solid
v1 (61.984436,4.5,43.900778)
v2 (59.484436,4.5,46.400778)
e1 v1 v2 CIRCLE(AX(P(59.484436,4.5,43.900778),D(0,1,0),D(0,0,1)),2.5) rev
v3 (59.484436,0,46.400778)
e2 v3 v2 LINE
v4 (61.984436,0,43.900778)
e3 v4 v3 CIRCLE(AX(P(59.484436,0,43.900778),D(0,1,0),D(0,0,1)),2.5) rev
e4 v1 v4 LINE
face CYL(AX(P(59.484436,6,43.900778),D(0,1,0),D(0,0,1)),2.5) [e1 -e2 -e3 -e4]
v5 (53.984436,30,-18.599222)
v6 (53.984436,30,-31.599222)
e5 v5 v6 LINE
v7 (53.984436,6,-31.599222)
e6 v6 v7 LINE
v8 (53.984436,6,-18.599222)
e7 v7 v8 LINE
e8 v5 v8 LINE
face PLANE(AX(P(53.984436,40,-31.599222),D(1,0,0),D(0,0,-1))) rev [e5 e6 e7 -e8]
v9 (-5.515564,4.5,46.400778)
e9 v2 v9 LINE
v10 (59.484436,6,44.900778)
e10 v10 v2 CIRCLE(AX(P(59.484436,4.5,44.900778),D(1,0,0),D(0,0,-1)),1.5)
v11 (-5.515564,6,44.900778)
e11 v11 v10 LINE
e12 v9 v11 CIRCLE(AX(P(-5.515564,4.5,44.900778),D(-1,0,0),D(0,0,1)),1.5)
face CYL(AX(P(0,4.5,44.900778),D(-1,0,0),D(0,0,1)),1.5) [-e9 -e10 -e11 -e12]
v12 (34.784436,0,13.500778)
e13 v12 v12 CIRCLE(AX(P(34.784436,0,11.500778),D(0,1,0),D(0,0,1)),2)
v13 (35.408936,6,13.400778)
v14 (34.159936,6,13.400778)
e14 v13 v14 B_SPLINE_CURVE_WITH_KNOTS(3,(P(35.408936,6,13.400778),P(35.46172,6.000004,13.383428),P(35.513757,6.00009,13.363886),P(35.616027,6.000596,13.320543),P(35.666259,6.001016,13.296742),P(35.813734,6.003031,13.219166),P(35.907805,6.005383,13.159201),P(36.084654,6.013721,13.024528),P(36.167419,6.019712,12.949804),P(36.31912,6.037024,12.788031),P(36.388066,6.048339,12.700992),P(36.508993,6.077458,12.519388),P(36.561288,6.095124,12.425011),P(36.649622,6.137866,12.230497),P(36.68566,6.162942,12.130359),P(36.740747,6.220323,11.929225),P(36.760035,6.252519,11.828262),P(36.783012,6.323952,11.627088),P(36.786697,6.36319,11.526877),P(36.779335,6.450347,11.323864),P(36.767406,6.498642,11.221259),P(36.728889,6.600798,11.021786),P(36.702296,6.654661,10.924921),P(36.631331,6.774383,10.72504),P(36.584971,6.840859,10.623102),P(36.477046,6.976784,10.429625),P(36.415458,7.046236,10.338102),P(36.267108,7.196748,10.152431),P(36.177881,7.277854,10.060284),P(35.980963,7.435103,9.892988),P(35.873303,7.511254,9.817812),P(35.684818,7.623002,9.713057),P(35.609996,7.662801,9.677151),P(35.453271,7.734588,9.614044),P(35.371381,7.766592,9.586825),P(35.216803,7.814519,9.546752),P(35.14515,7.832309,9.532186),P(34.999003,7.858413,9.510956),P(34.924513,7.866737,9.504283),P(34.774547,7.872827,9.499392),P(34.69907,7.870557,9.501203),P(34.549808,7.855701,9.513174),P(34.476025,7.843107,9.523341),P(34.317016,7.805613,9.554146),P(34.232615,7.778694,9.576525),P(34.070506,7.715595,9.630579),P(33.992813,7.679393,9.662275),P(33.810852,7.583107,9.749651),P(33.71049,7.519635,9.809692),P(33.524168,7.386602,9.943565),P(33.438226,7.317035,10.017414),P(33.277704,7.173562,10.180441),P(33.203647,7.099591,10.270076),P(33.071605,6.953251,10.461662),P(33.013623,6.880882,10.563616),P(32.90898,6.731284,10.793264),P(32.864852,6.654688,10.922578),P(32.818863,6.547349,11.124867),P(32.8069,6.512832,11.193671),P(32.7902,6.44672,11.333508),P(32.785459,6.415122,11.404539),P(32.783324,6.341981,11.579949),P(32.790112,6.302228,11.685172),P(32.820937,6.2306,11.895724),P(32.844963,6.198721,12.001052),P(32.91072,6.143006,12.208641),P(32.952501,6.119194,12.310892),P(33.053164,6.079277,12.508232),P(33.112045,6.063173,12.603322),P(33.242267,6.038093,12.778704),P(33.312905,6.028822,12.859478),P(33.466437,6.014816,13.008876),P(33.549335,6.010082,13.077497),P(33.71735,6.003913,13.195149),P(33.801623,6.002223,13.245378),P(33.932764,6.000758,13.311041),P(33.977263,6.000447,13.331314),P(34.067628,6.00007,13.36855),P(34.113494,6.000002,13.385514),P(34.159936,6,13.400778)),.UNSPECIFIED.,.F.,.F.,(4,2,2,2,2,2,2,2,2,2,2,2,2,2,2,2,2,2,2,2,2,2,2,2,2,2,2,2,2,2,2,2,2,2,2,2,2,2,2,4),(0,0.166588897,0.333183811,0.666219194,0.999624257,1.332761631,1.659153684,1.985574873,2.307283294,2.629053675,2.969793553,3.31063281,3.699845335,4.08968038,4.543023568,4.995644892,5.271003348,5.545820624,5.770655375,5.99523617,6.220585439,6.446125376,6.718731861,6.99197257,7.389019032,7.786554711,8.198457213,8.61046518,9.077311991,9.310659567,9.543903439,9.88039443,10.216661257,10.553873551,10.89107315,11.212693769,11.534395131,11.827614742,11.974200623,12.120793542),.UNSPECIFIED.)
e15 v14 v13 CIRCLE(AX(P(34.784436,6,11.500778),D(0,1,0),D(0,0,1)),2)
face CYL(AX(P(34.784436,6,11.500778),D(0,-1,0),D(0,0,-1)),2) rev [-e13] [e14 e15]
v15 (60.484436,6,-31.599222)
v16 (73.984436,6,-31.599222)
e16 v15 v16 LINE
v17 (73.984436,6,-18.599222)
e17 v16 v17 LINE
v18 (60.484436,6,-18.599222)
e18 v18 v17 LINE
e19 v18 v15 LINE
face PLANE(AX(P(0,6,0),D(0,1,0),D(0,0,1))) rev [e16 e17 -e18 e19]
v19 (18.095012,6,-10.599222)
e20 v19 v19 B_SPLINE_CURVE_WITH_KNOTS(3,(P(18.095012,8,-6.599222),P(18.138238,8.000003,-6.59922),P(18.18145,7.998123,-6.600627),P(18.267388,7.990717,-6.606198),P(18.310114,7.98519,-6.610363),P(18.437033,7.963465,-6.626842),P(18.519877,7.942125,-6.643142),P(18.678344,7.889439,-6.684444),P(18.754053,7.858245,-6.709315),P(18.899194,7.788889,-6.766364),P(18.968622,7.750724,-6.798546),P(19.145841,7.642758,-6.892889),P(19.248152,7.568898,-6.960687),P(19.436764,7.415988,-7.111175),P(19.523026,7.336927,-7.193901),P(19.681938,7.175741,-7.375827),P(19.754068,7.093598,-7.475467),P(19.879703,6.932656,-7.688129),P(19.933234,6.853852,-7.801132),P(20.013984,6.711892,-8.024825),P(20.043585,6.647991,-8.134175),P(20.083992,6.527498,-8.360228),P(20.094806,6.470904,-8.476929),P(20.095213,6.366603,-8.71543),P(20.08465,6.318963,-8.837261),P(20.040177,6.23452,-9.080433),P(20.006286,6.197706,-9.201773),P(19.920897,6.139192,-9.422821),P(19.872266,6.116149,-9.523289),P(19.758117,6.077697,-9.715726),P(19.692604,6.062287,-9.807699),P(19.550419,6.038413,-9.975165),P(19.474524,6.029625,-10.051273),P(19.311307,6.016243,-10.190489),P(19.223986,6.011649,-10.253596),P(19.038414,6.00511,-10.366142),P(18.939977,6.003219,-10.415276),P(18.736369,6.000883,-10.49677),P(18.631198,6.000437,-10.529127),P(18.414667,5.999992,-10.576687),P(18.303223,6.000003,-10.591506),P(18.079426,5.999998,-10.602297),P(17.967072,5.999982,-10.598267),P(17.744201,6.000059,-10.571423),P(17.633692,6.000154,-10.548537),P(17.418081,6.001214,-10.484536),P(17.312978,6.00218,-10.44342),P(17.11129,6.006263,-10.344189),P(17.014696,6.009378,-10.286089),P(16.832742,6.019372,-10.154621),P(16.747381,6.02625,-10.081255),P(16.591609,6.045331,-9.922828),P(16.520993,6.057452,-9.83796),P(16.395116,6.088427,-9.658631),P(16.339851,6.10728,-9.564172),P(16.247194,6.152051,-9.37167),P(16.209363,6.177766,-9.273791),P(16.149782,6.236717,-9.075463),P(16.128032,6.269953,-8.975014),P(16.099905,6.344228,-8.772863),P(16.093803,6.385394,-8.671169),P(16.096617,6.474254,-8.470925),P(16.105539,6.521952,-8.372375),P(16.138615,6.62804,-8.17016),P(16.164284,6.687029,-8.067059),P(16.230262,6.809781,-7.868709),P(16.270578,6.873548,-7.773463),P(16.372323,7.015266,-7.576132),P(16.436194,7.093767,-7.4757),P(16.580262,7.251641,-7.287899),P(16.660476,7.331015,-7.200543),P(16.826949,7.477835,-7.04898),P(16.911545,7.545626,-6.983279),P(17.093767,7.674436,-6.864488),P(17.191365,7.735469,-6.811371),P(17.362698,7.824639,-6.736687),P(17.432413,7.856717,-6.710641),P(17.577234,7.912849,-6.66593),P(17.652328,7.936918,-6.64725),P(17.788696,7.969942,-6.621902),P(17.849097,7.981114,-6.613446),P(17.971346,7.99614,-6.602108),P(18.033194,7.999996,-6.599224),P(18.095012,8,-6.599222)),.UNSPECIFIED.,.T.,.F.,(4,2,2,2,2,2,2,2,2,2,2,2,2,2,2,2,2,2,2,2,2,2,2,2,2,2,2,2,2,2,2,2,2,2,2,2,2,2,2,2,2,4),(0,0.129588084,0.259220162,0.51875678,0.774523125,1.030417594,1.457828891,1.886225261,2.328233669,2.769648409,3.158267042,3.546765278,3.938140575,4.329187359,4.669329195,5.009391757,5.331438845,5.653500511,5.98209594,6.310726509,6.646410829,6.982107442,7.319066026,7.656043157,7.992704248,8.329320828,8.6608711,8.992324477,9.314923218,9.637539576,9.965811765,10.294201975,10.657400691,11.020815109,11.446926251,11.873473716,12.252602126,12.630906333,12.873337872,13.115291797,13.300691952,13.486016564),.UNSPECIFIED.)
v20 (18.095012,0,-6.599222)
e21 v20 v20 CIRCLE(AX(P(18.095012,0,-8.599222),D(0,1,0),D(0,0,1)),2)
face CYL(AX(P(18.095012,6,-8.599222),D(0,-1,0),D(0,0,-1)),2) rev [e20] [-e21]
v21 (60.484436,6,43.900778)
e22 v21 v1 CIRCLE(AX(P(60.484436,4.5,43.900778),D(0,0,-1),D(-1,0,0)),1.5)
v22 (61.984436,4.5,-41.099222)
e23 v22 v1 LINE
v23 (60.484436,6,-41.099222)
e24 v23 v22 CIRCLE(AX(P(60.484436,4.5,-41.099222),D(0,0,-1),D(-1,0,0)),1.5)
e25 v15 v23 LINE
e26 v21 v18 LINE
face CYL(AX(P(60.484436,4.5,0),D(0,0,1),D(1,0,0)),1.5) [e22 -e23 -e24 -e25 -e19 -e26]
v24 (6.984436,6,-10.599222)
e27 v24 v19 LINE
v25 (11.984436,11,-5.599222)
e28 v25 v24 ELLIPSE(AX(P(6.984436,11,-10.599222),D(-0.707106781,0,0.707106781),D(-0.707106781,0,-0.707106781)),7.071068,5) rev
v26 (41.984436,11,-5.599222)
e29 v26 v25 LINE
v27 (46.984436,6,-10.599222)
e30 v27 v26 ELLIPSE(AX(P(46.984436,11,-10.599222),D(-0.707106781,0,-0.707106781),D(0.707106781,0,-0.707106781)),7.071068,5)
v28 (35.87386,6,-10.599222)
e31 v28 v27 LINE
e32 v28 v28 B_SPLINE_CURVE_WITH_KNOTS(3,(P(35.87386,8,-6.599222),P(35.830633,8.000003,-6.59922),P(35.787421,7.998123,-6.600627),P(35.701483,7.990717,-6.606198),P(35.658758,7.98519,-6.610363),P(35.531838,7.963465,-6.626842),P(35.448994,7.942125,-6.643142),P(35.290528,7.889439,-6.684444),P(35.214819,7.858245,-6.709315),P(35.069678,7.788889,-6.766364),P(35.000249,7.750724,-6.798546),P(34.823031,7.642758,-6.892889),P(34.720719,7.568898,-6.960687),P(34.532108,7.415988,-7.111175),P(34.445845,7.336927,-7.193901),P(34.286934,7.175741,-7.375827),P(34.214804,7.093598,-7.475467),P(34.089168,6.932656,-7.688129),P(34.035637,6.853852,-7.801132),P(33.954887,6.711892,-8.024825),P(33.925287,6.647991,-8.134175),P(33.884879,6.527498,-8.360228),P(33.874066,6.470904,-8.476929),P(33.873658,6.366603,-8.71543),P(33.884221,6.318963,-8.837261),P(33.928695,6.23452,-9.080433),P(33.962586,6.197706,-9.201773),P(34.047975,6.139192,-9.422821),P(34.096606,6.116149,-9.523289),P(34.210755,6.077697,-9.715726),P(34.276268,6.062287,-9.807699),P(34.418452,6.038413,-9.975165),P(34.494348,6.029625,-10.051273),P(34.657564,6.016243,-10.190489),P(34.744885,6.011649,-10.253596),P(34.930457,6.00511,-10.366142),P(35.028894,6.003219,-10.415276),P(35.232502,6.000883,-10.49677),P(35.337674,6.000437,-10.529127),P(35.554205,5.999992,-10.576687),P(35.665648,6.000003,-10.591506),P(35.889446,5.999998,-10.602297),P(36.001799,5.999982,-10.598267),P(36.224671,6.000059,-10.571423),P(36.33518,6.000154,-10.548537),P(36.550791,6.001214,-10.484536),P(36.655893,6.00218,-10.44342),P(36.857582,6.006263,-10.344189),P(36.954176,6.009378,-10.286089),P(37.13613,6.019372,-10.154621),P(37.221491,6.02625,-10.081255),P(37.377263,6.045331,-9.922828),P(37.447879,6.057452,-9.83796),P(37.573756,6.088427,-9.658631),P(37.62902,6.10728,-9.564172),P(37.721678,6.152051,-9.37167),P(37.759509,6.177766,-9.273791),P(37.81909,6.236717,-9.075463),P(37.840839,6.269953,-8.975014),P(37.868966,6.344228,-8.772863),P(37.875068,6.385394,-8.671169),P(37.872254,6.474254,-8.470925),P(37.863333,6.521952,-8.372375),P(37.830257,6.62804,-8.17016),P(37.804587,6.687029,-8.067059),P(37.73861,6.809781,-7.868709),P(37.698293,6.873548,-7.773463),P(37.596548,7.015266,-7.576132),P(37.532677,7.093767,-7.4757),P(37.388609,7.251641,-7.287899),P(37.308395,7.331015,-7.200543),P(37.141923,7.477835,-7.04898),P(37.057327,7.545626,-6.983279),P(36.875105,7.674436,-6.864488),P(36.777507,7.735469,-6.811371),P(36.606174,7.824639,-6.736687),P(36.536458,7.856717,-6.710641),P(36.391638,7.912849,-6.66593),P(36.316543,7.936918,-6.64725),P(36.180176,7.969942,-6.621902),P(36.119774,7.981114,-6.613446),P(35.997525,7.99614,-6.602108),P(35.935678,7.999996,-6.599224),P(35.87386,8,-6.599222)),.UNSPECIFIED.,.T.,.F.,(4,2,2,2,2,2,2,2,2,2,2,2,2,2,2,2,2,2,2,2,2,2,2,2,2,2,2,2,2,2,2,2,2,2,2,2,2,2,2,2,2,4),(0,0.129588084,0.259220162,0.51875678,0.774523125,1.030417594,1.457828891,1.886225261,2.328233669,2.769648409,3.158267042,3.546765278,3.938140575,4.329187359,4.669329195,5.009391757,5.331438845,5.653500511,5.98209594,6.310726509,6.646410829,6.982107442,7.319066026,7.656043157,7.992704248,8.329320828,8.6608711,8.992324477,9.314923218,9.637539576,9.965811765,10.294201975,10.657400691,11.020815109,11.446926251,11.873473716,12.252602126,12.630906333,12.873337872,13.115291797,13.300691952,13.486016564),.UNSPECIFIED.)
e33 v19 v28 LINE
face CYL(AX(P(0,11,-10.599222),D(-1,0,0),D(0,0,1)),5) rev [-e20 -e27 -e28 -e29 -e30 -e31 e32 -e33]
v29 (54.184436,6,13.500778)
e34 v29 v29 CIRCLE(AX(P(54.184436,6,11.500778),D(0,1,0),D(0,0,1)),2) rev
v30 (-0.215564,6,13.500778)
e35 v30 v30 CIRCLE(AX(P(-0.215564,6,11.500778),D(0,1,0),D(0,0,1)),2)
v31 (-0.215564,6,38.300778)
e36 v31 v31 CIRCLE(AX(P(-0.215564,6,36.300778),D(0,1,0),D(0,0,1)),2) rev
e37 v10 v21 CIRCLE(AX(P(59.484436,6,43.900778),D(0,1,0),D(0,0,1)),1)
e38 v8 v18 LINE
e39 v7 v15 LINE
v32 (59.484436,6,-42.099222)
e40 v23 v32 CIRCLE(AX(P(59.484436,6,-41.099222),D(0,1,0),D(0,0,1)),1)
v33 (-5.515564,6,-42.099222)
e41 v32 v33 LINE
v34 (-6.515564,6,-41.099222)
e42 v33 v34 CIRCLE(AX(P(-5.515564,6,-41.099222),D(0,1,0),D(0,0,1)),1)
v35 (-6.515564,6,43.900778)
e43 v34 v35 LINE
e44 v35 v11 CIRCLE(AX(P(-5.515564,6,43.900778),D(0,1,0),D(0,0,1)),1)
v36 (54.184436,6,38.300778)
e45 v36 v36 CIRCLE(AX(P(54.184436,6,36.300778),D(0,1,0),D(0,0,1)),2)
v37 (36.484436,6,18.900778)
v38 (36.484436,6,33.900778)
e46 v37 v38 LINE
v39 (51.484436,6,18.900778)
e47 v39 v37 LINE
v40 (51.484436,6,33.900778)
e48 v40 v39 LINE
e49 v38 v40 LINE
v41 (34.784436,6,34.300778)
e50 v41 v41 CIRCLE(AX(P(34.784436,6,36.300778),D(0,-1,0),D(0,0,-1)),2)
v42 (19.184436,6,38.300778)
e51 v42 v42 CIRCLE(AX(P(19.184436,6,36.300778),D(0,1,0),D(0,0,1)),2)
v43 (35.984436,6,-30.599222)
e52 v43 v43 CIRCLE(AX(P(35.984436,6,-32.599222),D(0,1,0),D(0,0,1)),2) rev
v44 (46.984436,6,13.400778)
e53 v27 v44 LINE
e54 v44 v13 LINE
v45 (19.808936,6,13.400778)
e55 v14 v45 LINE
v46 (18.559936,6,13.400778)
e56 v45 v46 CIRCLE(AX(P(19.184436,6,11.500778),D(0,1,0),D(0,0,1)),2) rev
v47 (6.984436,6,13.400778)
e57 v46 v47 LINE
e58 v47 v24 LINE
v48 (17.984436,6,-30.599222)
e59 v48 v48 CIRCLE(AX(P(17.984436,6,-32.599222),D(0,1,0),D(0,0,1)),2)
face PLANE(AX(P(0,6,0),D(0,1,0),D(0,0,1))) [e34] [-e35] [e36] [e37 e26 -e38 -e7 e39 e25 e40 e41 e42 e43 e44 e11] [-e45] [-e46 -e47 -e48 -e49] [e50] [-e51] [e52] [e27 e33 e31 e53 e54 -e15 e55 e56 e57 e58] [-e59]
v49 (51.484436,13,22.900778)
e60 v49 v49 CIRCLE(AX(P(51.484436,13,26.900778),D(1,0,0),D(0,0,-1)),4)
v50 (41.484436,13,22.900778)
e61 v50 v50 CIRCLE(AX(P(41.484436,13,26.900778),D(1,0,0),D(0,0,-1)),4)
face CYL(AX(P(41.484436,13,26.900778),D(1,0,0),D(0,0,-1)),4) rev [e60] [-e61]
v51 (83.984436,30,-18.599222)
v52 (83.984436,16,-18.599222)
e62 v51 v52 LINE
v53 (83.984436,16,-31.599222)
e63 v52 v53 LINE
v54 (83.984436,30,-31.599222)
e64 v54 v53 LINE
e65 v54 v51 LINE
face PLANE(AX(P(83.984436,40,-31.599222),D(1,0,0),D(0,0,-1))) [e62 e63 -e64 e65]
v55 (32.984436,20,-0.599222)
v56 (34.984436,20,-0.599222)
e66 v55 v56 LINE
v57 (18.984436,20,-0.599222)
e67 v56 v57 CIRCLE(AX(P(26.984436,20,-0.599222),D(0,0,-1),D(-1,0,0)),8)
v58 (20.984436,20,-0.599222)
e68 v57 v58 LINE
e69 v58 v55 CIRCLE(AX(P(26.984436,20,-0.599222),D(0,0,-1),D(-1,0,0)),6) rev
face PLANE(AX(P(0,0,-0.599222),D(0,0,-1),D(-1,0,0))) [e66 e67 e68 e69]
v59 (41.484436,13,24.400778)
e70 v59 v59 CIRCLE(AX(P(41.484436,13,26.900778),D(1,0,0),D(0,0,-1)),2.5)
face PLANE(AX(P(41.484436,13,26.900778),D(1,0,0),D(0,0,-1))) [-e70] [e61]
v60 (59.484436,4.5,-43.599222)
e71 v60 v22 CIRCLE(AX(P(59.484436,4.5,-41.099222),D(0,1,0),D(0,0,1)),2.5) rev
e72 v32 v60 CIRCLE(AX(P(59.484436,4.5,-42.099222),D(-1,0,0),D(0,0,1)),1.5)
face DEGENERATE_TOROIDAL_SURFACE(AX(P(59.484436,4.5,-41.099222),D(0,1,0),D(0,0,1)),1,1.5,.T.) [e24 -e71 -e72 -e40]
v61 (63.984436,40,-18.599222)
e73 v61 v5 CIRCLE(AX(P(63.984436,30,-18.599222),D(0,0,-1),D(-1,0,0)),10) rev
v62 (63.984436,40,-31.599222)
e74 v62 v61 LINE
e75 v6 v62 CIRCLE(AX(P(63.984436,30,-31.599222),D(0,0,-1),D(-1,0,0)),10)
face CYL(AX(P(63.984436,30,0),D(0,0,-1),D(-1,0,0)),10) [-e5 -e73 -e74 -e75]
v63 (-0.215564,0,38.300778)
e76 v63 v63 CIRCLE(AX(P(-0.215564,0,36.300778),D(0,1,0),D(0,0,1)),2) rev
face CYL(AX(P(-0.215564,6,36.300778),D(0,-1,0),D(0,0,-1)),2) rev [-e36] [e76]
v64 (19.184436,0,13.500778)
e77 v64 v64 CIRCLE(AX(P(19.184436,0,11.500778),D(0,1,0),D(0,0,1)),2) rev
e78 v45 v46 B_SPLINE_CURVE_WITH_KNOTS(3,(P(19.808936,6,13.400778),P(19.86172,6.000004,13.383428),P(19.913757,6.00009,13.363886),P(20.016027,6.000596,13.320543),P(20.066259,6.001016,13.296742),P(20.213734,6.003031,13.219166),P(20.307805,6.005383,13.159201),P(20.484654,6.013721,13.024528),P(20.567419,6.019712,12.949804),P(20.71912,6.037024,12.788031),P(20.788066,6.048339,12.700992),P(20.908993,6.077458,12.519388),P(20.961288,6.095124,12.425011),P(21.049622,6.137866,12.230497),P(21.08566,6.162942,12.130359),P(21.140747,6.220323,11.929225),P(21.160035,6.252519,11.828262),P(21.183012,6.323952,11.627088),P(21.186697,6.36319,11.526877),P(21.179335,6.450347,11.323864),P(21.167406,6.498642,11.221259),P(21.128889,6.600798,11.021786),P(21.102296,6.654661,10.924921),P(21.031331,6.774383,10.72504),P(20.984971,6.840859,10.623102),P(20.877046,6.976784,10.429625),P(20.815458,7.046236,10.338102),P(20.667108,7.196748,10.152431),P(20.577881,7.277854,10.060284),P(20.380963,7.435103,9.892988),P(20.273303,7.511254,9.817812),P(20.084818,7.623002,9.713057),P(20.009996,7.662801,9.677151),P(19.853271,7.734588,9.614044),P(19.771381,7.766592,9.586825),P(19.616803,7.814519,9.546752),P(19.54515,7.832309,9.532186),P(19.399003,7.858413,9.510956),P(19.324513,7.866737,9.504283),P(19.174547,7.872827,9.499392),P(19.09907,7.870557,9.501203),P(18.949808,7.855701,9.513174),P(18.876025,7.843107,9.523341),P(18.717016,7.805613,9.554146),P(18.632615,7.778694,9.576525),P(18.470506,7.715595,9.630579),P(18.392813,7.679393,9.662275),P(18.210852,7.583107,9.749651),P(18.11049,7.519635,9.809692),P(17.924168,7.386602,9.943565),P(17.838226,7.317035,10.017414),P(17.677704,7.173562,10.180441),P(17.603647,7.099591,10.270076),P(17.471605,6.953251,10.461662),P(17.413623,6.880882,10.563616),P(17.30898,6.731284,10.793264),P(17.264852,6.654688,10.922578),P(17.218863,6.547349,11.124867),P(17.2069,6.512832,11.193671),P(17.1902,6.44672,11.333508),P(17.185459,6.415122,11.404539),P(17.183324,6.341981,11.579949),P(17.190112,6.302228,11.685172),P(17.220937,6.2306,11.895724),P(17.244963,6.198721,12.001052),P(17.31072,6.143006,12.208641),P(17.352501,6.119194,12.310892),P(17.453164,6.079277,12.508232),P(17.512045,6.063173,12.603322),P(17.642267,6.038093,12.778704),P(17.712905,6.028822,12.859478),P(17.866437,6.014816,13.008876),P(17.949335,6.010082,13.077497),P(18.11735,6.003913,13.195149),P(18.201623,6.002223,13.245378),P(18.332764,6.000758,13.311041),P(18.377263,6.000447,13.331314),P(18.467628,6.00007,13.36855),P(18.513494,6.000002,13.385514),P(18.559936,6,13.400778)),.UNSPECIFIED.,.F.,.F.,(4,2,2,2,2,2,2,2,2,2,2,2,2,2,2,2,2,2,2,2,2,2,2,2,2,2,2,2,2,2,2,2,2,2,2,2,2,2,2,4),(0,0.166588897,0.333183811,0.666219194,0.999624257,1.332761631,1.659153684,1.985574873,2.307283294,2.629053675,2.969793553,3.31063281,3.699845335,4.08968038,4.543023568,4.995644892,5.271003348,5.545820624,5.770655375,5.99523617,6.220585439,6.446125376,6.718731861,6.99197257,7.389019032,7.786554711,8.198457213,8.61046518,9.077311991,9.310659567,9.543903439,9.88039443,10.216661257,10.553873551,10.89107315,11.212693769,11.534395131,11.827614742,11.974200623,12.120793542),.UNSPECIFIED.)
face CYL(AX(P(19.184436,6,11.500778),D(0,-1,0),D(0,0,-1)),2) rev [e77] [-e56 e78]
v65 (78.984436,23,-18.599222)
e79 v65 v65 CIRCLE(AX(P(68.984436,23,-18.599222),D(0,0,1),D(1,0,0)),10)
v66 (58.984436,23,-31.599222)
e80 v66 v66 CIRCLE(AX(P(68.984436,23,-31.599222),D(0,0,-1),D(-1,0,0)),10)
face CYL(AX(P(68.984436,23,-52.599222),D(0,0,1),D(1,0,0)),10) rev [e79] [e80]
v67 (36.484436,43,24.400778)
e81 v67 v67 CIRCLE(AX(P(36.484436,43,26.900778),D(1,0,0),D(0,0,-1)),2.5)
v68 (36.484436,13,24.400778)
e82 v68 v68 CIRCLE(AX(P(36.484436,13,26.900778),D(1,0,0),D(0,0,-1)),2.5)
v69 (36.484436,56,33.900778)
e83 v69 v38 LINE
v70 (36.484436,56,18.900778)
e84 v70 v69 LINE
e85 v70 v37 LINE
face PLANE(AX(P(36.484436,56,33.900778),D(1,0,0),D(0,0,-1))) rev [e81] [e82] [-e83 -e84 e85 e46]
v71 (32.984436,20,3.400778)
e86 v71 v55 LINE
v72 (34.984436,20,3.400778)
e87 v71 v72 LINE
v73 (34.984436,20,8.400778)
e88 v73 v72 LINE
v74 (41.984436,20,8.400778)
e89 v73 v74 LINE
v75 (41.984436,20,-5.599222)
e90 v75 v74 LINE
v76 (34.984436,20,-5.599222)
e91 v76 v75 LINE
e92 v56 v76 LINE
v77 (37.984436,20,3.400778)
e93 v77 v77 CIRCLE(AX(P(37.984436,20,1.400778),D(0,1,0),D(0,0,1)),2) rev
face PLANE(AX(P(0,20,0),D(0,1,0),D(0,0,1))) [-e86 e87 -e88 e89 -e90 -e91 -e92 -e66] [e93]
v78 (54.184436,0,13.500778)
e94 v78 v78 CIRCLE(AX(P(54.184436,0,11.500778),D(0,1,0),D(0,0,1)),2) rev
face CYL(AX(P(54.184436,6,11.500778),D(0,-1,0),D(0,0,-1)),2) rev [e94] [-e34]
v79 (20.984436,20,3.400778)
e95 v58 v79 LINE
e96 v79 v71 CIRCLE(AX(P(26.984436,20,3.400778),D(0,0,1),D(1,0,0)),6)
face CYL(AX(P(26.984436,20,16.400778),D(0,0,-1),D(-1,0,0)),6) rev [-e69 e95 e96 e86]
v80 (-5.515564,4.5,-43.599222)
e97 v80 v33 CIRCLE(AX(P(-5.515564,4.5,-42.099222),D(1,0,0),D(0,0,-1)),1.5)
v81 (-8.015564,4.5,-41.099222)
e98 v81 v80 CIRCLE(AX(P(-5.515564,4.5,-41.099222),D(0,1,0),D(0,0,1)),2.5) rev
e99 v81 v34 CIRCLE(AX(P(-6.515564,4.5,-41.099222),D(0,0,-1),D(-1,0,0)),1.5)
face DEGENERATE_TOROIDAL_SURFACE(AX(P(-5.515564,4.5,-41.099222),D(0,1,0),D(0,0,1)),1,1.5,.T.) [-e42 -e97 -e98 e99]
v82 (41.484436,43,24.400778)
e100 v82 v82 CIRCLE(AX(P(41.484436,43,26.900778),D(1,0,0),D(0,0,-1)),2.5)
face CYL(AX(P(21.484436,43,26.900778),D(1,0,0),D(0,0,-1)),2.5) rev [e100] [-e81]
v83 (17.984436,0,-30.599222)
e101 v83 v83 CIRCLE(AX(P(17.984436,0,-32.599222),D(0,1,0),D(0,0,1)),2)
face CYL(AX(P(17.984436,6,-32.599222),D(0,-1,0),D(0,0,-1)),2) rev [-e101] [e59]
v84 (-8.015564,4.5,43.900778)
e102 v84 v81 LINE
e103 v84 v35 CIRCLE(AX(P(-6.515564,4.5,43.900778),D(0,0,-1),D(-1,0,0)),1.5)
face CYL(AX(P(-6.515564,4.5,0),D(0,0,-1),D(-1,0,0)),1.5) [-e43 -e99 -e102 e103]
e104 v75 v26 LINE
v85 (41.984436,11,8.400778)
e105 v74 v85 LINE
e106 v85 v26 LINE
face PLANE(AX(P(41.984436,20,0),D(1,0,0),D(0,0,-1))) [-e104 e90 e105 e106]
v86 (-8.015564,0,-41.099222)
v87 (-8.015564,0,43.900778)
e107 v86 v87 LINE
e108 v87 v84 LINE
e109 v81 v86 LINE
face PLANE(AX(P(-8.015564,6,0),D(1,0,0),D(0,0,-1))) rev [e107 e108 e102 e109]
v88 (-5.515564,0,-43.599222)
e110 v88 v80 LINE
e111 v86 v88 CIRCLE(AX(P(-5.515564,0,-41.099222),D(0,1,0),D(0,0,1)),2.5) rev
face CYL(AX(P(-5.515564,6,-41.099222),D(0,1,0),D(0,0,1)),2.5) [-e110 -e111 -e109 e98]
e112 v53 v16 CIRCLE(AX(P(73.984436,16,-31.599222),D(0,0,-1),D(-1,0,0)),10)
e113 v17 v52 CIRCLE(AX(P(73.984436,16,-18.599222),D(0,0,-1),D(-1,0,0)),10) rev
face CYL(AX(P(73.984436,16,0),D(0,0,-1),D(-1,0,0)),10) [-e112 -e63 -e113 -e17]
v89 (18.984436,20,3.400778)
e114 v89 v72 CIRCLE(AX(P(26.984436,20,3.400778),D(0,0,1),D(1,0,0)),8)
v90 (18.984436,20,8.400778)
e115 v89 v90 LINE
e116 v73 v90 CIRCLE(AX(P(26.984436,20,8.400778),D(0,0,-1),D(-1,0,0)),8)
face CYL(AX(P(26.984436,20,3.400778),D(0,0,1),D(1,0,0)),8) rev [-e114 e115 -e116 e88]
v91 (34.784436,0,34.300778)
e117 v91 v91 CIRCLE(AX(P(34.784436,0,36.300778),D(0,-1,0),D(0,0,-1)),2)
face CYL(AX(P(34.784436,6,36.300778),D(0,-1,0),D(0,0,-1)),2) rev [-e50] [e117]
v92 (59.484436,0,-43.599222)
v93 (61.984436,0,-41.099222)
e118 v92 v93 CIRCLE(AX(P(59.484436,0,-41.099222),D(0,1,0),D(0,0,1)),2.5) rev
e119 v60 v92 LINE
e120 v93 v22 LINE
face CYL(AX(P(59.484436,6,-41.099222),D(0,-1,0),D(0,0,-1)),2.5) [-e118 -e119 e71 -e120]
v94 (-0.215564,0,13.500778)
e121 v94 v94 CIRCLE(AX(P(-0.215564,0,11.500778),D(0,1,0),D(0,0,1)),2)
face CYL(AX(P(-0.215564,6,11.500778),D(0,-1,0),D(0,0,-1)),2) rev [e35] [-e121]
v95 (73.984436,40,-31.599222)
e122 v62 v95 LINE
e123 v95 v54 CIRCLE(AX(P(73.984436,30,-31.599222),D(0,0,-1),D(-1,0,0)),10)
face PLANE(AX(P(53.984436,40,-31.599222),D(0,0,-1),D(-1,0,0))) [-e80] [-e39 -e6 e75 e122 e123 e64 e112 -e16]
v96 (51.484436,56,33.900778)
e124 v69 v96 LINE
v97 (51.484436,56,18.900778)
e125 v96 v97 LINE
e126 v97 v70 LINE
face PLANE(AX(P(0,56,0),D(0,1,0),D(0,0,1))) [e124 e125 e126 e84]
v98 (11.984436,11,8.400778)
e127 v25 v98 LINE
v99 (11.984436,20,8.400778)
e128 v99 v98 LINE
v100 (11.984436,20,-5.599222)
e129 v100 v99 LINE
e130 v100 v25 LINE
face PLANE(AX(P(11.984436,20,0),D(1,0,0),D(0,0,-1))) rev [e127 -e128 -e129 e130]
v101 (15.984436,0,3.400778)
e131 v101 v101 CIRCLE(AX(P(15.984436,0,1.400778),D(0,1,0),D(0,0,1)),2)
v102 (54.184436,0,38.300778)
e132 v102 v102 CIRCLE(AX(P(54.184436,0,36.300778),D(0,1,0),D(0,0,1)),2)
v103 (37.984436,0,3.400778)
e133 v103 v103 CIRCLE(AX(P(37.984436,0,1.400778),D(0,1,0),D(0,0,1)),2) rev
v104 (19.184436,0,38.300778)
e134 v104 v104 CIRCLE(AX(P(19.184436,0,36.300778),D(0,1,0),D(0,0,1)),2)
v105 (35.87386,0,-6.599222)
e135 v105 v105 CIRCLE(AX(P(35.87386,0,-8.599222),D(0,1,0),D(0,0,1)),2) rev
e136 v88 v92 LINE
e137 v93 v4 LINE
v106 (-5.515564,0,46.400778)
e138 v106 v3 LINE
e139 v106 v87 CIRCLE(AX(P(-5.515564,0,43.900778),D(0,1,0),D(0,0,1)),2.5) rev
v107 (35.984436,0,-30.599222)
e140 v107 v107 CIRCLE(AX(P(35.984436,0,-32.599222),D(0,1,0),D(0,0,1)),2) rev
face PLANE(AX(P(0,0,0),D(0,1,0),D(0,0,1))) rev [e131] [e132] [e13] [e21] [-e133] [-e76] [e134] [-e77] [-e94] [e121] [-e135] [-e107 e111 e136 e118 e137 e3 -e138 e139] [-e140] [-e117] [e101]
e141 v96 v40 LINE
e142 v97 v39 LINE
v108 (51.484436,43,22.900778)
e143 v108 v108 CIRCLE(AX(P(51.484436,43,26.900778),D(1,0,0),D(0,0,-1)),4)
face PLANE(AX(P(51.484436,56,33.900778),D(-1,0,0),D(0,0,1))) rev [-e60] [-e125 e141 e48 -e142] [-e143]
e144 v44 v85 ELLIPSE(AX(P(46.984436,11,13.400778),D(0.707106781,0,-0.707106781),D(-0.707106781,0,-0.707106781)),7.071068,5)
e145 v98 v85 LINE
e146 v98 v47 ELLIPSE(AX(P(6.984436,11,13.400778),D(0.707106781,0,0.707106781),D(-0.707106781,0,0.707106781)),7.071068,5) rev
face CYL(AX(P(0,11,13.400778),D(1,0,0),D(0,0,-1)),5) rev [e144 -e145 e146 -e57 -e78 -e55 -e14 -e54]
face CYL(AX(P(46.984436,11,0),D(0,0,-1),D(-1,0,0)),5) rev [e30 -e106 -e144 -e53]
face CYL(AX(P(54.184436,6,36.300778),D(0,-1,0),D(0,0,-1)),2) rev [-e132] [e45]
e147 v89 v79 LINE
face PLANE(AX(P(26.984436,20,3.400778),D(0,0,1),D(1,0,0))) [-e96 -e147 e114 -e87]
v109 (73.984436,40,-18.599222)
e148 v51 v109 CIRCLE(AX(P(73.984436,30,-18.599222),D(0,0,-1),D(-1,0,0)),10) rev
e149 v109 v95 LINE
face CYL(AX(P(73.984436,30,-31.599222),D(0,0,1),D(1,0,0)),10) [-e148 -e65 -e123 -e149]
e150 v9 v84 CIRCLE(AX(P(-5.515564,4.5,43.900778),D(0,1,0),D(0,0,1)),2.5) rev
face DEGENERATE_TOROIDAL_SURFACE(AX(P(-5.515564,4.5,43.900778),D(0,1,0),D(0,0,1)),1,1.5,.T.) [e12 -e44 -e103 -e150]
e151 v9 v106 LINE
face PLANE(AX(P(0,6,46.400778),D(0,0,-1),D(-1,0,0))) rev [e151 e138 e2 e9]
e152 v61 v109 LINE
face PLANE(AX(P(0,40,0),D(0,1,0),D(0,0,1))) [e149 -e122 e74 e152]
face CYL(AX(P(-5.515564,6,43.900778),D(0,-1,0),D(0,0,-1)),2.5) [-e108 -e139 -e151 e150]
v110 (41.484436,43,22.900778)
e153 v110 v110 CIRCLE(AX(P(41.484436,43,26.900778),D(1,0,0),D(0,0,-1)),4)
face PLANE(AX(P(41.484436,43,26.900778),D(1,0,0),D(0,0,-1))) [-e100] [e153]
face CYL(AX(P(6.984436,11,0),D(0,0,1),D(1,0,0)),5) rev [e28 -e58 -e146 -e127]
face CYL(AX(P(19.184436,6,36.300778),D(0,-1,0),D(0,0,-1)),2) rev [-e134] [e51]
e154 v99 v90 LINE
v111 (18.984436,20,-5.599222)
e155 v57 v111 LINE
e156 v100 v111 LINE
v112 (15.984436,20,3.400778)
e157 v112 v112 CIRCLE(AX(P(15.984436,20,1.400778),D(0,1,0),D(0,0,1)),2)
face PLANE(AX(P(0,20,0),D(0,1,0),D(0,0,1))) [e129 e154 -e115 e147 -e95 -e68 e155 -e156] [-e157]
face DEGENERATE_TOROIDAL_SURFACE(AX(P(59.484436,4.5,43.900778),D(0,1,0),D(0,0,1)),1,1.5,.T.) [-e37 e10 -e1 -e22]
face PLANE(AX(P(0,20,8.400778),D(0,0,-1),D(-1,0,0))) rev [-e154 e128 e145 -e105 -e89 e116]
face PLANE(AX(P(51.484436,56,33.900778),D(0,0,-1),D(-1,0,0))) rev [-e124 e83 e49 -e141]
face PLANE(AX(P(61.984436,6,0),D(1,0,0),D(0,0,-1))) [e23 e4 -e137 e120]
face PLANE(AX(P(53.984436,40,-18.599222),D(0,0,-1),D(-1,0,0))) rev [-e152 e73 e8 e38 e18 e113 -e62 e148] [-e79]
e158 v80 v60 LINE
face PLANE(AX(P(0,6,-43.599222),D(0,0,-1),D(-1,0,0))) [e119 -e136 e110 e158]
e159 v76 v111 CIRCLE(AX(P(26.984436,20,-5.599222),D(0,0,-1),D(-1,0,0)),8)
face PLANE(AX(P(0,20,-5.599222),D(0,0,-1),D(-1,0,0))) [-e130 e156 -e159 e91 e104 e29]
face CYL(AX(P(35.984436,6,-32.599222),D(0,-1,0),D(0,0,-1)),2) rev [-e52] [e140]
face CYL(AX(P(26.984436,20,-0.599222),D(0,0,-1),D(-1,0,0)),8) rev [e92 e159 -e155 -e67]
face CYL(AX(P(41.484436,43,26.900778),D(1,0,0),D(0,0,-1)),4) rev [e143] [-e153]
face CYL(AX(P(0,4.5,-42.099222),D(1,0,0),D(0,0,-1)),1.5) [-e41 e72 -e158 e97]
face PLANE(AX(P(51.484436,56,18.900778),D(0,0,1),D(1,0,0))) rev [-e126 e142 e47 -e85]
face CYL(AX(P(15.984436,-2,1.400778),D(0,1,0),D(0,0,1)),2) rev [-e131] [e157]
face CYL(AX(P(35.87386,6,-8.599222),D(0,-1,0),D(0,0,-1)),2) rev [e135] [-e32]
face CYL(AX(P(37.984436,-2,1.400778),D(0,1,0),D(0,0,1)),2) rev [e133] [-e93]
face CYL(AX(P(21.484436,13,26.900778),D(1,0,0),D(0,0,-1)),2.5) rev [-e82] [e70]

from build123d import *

# Parameters (mm, degrees)
SKETCH1_W           = 70
SKETCH1_H           = 90
SKETCH1_R           = 2
BOSS_EXTRUDE1_DEPTH = 6
SKETCH3_W           = 15
SKETCH3_H           = 7
BOSS_EXTRUDE2_DEPTH = 14
FILLET1_R           = 2.5
FILLET2_R           = 1.5
CUT_EXTRUDE1_DEPTH  = 22
SKETCH5_R           = 6
CUT_EXTRUDE2_DEPTH  = 22
CUT_EXTRUDE4_DEPTH  = 5
CUT_EXTRUDE5_START  = -5
SKETCH9_R           = 8
SKETCH9_R_2         = 6
CUT_EXTRUDE5_DEPTH  = 5
FILLET3_R           = 5
SKETCH10_W          = 30
SKETCH10_H          = 13
BOSS_EXTRUDE5_DEPTH = 34
CUT_EXTRUDE6_DEPTH  = 34
FILLET5_R           = 10
SKETCH14_W          = 15
SKETCH14_H          = 15
BOSS_EXTRUDE6_DEPTH = 50
SKETCH15_R          = 4
CUT_EXTRUDE7_DEPTH  = 10
SKETCH17_R          = 2.5
CUT_EXTRUDE8_DEPTH  = 30


with BuildPart() as part:
    # Sketch1 → Boss-Extrude1 (new body)
    with BuildSketch(Plane(origin=(0, 0, 0), x_dir=(1, 0, 0), z_dir=(0, 1, 0))):
        with Locations((26.984435798, -1.40077821)):
            Rectangle(SKETCH1_W, SKETCH1_H)
        with Locations(Location((17.984435798, 32.59922179, 0), (0, 0, 270))):
            Circle(SKETCH1_R, mode=Mode.SUBTRACT)
        with Locations(Location((18.095011811, 8.59922179, 0), (0, 0, 270))):
            Circle(SKETCH1_R, mode=Mode.SUBTRACT)
        with Locations(Location((35.873859784, 8.59922179, 0), (0, 0, 270))):
            Circle(SKETCH1_R, mode=Mode.SUBTRACT)
        with Locations(Location((35.984435798, 32.59922179, 0), (0, 0, 270))):
            Circle(SKETCH1_R, mode=Mode.SUBTRACT)
        with Locations(Location((19.184435798, -11.50077821, 0), (0, 0, 270))):
            Circle(SKETCH1_R, mode=Mode.SUBTRACT)
        with Locations(Location((-0.215564202, -11.50077821, 0), (0, 0, 270))):
            Circle(SKETCH1_R, mode=Mode.SUBTRACT)
        with Locations(Location((-0.215564202, -36.30077821, 0), (0, 0, 270))):
            Circle(SKETCH1_R, mode=Mode.SUBTRACT)
        with Locations(Location((19.184435798, -36.30077821, 0), (0, 0, 270))):
            Circle(SKETCH1_R, mode=Mode.SUBTRACT)
        with Locations(Location((54.184435798, -36.30077821, 0), (0, 0, 270))):
            Circle(SKETCH1_R, mode=Mode.SUBTRACT)
        with Locations(Location((34.784435798, -36.30077821, 0), (0, 0, 90))):
            Circle(SKETCH1_R, mode=Mode.SUBTRACT)
        with Locations(Location((34.784435798, -11.50077821, 0), (0, 0, 270))):
            Circle(SKETCH1_R, mode=Mode.SUBTRACT)
        with Locations(Location((54.184435798, -11.50077821, 0), (0, 0, 270))):
            Circle(SKETCH1_R, mode=Mode.SUBTRACT)
    extrude(amount=BOSS_EXTRUDE1_DEPTH)

    # Sketch3 → Boss-Extrude2 (add)
    with BuildSketch(Plane(origin=(0, 6, 0), x_dir=(1, 0, 0), z_dir=(0, 1, 0))):
        with Locations((19.484435798, 2.09922179)):
            Rectangle(SKETCH3_W, SKETCH3_H)
        with Locations((34.484435798, 2.09922179)):
            Rectangle(SKETCH3_W, SKETCH3_H)
        with Locations((34.484435798, -4.90077821)):
            Rectangle(SKETCH3_W, SKETCH3_H)
        with Locations((19.484435798, -4.90077821)):
            Rectangle(SKETCH3_W, SKETCH3_H)
    extrude(amount=BOSS_EXTRUDE2_DEPTH)

    # Fillet1
    fillet1_edges = [part.edges().sort_by_distance(p)[0] for p in [
        (-8.015564202, 3, 46.40077821),
        (-8.015564202, 3, -43.59922179),
        (61.984435798, 3, -43.59922179),
        (61.984435798, 3, 46.40077821),
    ]]
    fillet(fillet1_edges, radius=FILLET1_R)

    # Fillet2
    fillet2_edges = [part.edges().sort_by_distance(p)[0] for p in [
        (-8.015564202, 6, 1.40077821),
        (26.984435798, 6, -43.59922179),
        (26.984435798, 6, 46.40077821),
        (61.984435798, 6, 1.40077821),
        (-7.283331155, 6, 45.668545163),
        (61.252202751, 6, 45.668545163),
        (61.252202751, 6, -42.866988743),
        (-7.283331155, 6, -42.866988743),
    ]]
    fillet(fillet2_edges, radius=FILLET2_R)

    # Sketch4 → Cut-Extrude1 (cut)
    with BuildSketch(Plane(origin=(0, 20, 0), x_dir=(1, 0, 0), z_dir=(0, 1, 0))):
        with BuildLine():
            ThreePointArc((17.984435798, -1.40077821), (15.984435798, 0.59922179), (13.984435798, -1.40077821))
            Line((13.984435798, -1.40077821), (17.984435798, -1.40077821))
        make_face()
        with BuildLine():
            Line((17.984435798, -1.40077821), (13.984435798, -1.40077821))
            ThreePointArc((13.984435798, -1.40077821), (15.984435798, -3.40077821), (17.984435798, -1.40077821))
        make_face()
        with BuildLine():
            ThreePointArc((39.984435798, -1.40077821), (37.984435798, 0.59922179), (35.984435798, -1.40077821))
            Line((35.984435798, -1.40077821), (39.984435798, -1.40077821))
        make_face()
        with BuildLine():
            Line((39.984435798, -1.40077821), (35.984435798, -1.40077821))
            ThreePointArc((35.984435798, -1.40077821), (37.984435798, -3.40077821), (39.984435798, -1.40077821))
        make_face()
    extrude(amount=-CUT_EXTRUDE1_DEPTH, mode=Mode.SUBTRACT)

    # Sketch5 → Cut-Extrude2 (cut)
    with BuildSketch(Plane(origin=(0, 0, -5.59922179), x_dir=(-1, 0, 0), z_dir=(0, 0, -1))):
        with Locations((-26.984435798, 20)):
            Circle(SKETCH5_R)
    extrude(amount=-CUT_EXTRUDE2_DEPTH, mode=Mode.SUBTRACT)

    # Sketch6 → Cut-Extrude4 (cut)
    with BuildSketch(Plane(origin=(0, 0, -5.59922179), x_dir=(-1, 0, 0), z_dir=(0, 0, -1))):
        with BuildLine():
            ThreePointArc((-34.984435798, 20), (-26.984435798, 12), (-18.984435798, 20))
            Line((-18.984435798, 20), (-20.984435798, 20))
            ThreePointArc((-20.984435798, 20), (-26.984435798, 14), (-32.984435798, 20))
            Line((-32.984435798, 20), (-34.984435798, 20))
        make_face()
    extrude(amount=-CUT_EXTRUDE4_DEPTH, mode=Mode.SUBTRACT)

    # Sketch9 → Cut-Extrude5 (cut)
    with BuildSketch(Plane.XY.offset(8.40077821).offset(CUT_EXTRUDE5_START)):
        with Locations((26.984435798, 20)):
            Circle(SKETCH9_R)
        with Locations((26.984435798, 20)):
            Circle(SKETCH9_R_2, mode=Mode.SUBTRACT)
    extrude(amount=CUT_EXTRUDE5_DEPTH, mode=Mode.SUBTRACT)

    # Fillet3
    # the kernel refuses this fillet: 5 mm, written as the material it adds along each edge
    with BuildSketch(Plane(origin=(41.984435798, 6, 8.40077821), x_dir=(0, 0, 1), z_dir=(-1, 0, 0))) as fillet3_piece_1_section:
        with BuildLine():
            CenterArc((FILLET3_R, FILLET3_R), FILLET3_R, 180, 90)
            Line((0, FILLET3_R), (0, 0))
            Line((0, 0), (FILLET3_R, 0))
        make_face()
    fillet3_piece_1 = extrude(amount=30, mode=Mode.PRIVATE)
    fillet3_piece_1 = fillet3_piece_1 - Plane(origin=(34.784435798, 7.197458463, 11.50077821), x_dir=(0, 0, 1), z_dir=(0, -1, 0)) * Cylinder(2, 80, mode=Mode.PRIVATE)
    fillet3_piece_1 = fillet3_piece_1 - Plane(origin=(19.184435798, 7.197458463, 11.50077821), x_dir=(0, 0, 1), z_dir=(0, -1, 0)) * Cylinder(2, 80, mode=Mode.PRIVATE)
    add(fillet3_piece_1)
    with BuildSketch(Plane(origin=(11.984435798, 6, -5.59922179), x_dir=(-1, 0, 0), z_dir=(0, 0, 1))) as fillet3_piece_2:
        with BuildLine():
            CenterArc((FILLET3_R, -FILLET3_R), FILLET3_R, 90, 90)
            Line((0, -FILLET3_R), (0, 0))
            Line((0, 0), (FILLET3_R, 0))
        make_face()
    extrude(amount=14)
    with BuildSketch(Plane(origin=(41.984435798, 6, -5.59922179), x_dir=(0, 0, -1), z_dir=(-1, 0, 0))) as fillet3_piece_3_section:
        with BuildLine():
            CenterArc((FILLET3_R, -FILLET3_R), FILLET3_R, 90, 90)
            Line((0, -FILLET3_R), (0, 0))
            Line((0, 0), (FILLET3_R, 0))
        make_face()
    fillet3_piece_3 = extrude(amount=30, mode=Mode.PRIVATE)
    fillet3_piece_3 = fillet3_piece_3 - Plane(origin=(35.873859784, 7.200103182, -8.59922179), x_dir=(0, 0, 1), z_dir=(0, -1, 0)) * Cylinder(2, 80, mode=Mode.PRIVATE)
    fillet3_piece_3 = fillet3_piece_3 - Plane(origin=(18.095011811, 7.200103182, -8.59922179), x_dir=(0, 0, 1), z_dir=(0, -1, 0)) * Cylinder(2, 80, mode=Mode.PRIVATE)
    add(fillet3_piece_3)
    with BuildSketch(Plane(origin=(41.984435798, 6, -5.59922179), x_dir=(1, 0, 0), z_dir=(0, 0, 1))) as fillet3_piece_4:
        with BuildLine():
            CenterArc((FILLET3_R, FILLET3_R), FILLET3_R, 180, 90)
            Line((0, FILLET3_R), (0, 0))
            Line((0, 0), (FILLET3_R, 0))
        make_face()
    extrude(amount=14)
    with BuildSketch(Plane(origin=(41.984435798, 6, -5.59922179), x_dir=(1, 0, 0), z_dir=(0, 0, 1))) as fillet3_piece_5a_section:
        with BuildLine():
            CenterArc((FILLET3_R, FILLET3_R), FILLET3_R, 180, 90)
            Line((0, FILLET3_R), (0, 0))
            Line((0, 0), (FILLET3_R, 0))
        make_face()
    fillet3_piece_5a = extrude(amount=26.5, mode=Mode.PRIVATE)
    fillet3_piece_5a = split(fillet3_piece_5a, bisect_by=Plane(origin=(43.116411369, 7.131975571, 8.40077821), z_dir=(0, 0, 1)), keep=Keep.TOP, mode=Mode.PRIVATE)
    with BuildSketch(Plane(origin=(54.484435798, 6, 8.40077821), x_dir=(0, 0, 1), z_dir=(-1, 0, 0))) as fillet3_piece_5b_section:
        with BuildLine():
            CenterArc((FILLET3_R, FILLET3_R), FILLET3_R, 180, 90)
            Line((0, FILLET3_R), (0, 0))
            Line((0, 0), (FILLET3_R, 0))
        make_face()
    fillet3_piece_5b = extrude(amount=42.5, mode=Mode.PRIVATE)
    fillet3_piece_5b = fillet3_piece_5b - Plane(origin=(54.184435798, 7.177432689, 11.50077821), x_dir=(0, 0, 1), z_dir=(0, -1, 0)) * Cylinder(2, 105, mode=Mode.PRIVATE)
    fillet3_piece_5b = split(fillet3_piece_5b, bisect_by=Plane(origin=(41.984435798, 7.177432689, 9.458456652), z_dir=(1, 0, 0)), keep=Keep.TOP, mode=Mode.PRIVATE)
    fillet3_piece_5 = fillet3_piece_5a & fillet3_piece_5b
    add(fillet3_piece_5)
    with BuildSketch(Plane(origin=(41.984435798, 6, 8.40077821), x_dir=(0, 0, 1), z_dir=(-1, 0, 0))) as fillet3_piece_6a_section:
        with BuildLine():
            CenterArc((FILLET3_R, FILLET3_R), FILLET3_R, 180, 90)
            Line((0, FILLET3_R), (0, 0))
            Line((0, 0), (FILLET3_R, 0))
        make_face()
    fillet3_piece_6a = extrude(amount=42.5, mode=Mode.PRIVATE)
    fillet3_piece_6a = fillet3_piece_6a - Plane(origin=(-0.215564202, 7.17743263, 11.50077821), x_dir=(0, 0, 1), z_dir=(0, -1, 0)) * Cylinder(2, 105, mode=Mode.PRIVATE)
    fillet3_piece_6a = split(fillet3_piece_6a, bisect_by=Plane(origin=(11.984435798, 7.17743263, 9.458456401), z_dir=(-1, 0, 0)), keep=Keep.TOP, mode=Mode.PRIVATE)
    with BuildSketch(Plane(origin=(11.984435798, 6, -5.59922179), x_dir=(-1, 0, 0), z_dir=(0, 0, 1))) as fillet3_piece_6b_section:
        with BuildLine():
            CenterArc((FILLET3_R, -FILLET3_R), FILLET3_R, 90, 90)
            Line((0, -FILLET3_R), (0, 0))
            Line((0, 0), (FILLET3_R, 0))
        make_face()
    fillet3_piece_6b = extrude(amount=26.5, mode=Mode.PRIVATE)
    fillet3_piece_6b = split(fillet3_piece_6b, bisect_by=Plane(origin=(10.852460226, 7.131975571, 8.40077821), z_dir=(0, 0, 1)), keep=Keep.TOP, mode=Mode.PRIVATE)
    fillet3_piece_6 = fillet3_piece_6a & fillet3_piece_6b
    add(fillet3_piece_6)
    with BuildSketch(Plane(origin=(11.984435798, 6, -18.09922179), x_dir=(-1, 0, 0), z_dir=(0, 0, 1))) as fillet3_piece_7a_section:
        with BuildLine():
            CenterArc((FILLET3_R, -FILLET3_R), FILLET3_R, 90, 90)
            Line((0, -FILLET3_R), (0, 0))
            Line((0, 0), (FILLET3_R, 0))
        make_face()
    fillet3_piece_7a = extrude(amount=26.5, mode=Mode.PRIVATE)
    fillet3_piece_7a = split(fillet3_piece_7a, bisect_by=Plane(origin=(10.852460226, 7.131975571, -5.59922179), z_dir=(0, 0, -1)), keep=Keep.TOP, mode=Mode.PRIVATE)
    with BuildSketch(Plane(origin=(41.984435798, 6, -5.59922179), x_dir=(0, 0, -1), z_dir=(-1, 0, 0))) as fillet3_piece_7b_section:
        with BuildLine():
            CenterArc((FILLET3_R, -FILLET3_R), FILLET3_R, 90, 90)
            Line((0, -FILLET3_R), (0, 0))
            Line((0, 0), (FILLET3_R, 0))
        make_face()
    fillet3_piece_7b = extrude(amount=42.5, mode=Mode.PRIVATE)
    fillet3_piece_7b = split(fillet3_piece_7b, bisect_by=Plane(origin=(11.984435798, 7.131975571, -6.731197361), z_dir=(-1, 0, 0)), keep=Keep.TOP, mode=Mode.PRIVATE)
    fillet3_piece_7 = fillet3_piece_7a & fillet3_piece_7b
    add(fillet3_piece_7)
    with BuildSketch(Plane(origin=(41.984435798, 6, -18.09922179), x_dir=(1, 0, 0), z_dir=(0, 0, 1))) as fillet3_piece_8a_section:
        with BuildLine():
            CenterArc((FILLET3_R, FILLET3_R), FILLET3_R, 180, 90)
            Line((0, FILLET3_R), (0, 0))
            Line((0, 0), (FILLET3_R, 0))
        make_face()
    fillet3_piece_8a = extrude(amount=26.5, mode=Mode.PRIVATE)
    fillet3_piece_8a = split(fillet3_piece_8a, bisect_by=Plane(origin=(43.116411369, 7.131975571, -5.59922179), z_dir=(0, 0, -1)), keep=Keep.TOP, mode=Mode.PRIVATE)
    with BuildSketch(Plane(origin=(54.484435798, 6, -5.59922179), x_dir=(0, 0, -1), z_dir=(-1, 0, 0))) as fillet3_piece_8b_section:
        with BuildLine():
            CenterArc((FILLET3_R, -FILLET3_R), FILLET3_R, 90, 90)
            Line((0, -FILLET3_R), (0, 0))
            Line((0, 0), (FILLET3_R, 0))
        make_face()
    fillet3_piece_8b = extrude(amount=42.5, mode=Mode.PRIVATE)
    fillet3_piece_8b = split(fillet3_piece_8b, bisect_by=Plane(origin=(41.984435798, 7.131975571, -6.731197361), z_dir=(1, 0, 0)), keep=Keep.TOP, mode=Mode.PRIVATE)
    fillet3_piece_8 = fillet3_piece_8a & fillet3_piece_8b
    add(fillet3_piece_8)

    # Sketch10 → Boss-Extrude5 (add)
    with BuildSketch(Plane(origin=(0, 6, 0), x_dir=(1, 0, 0), z_dir=(0, 1, 0))):
        with Locations((68.984435798, 25.09922179)):
            Rectangle(SKETCH10_W, SKETCH10_H)
    extrude(amount=BOSS_EXTRUDE5_DEPTH)

    # Sketch13 → Cut-Extrude6 (cut)
    with BuildSketch(Plane.XY.offset(-18.59922179)):
        with BuildLine():
            ThreePointArc((78.984435798, 23), (76.05550361, 30.071067812), (68.984435798, 33))
            Line((68.984435798, 33), (68.984435798, 23))
            Line((68.984435798, 23), (78.984435798, 23))
        make_face()
        with BuildLine():
            Line((68.984435798, 23), (68.984435798, 33))
            ThreePointArc((68.984435798, 33), (61.913367986, 30.071067812), (58.984435798, 23))
            Line((58.984435798, 23), (68.984435798, 23))
        make_face()
        with BuildLine():
            Line((78.984435798, 23), (68.984435798, 23))
            Line((68.984435798, 23), (68.984435798, 13))
            ThreePointArc((68.984435798, 13), (76.05550361, 15.928932188), (78.984435798, 23))
        make_face()
        with BuildLine():
            Line((68.984435798, 13), (68.984435798, 23))
            Line((68.984435798, 23), (58.984435798, 23))
            ThreePointArc((58.984435798, 23), (61.913367986, 15.928932188), (68.984435798, 13))
        make_face()
    extrude(amount=-CUT_EXTRUDE6_DEPTH, mode=Mode.SUBTRACT)

    # Fillet5
    fillet5_edges = [part.edges().sort_by_distance(p)[0] for p in [
        (83.984435798, 6, -25.09922179),
        (83.984435798, 40, -25.09922179),
        (53.984435798, 40, -25.09922179),
    ]]
    fillet(fillet5_edges, radius=FILLET5_R)

    # Sketch14 → Boss-Extrude6 (add)
    with BuildSketch(Plane(origin=(0, 6, 0), x_dir=(1, 0, 0), z_dir=(0, 1, 0))):
        with Locations((43.984435798, -26.40077821)):
            Rectangle(SKETCH14_W, SKETCH14_H)
    extrude(amount=BOSS_EXTRUDE6_DEPTH)

    # Sketch15 → Cut-Extrude7 (cut)
    with BuildSketch(Plane(origin=(51.484435798, 0, 0), x_dir=(0, 0, -1), z_dir=(1, 0, 0))):
        with Locations((-26.90077821, 13)):
            Circle(SKETCH15_R)
        with Locations((-26.90077821, 43)):
            Circle(SKETCH15_R)
    extrude(amount=-CUT_EXTRUDE7_DEPTH, mode=Mode.SUBTRACT)

    # Sketch17 → Cut-Extrude8 (cut)
    with BuildSketch(Plane(origin=(51.484435798, 0, 0), x_dir=(0, 0, -1), z_dir=(1, 0, 0))):
        with Locations((-26.90077821, 43)):
            Circle(SKETCH17_R)
        with Locations((-26.90077821, 13)):
            Circle(SKETCH17_R)
    extrude(amount=-CUT_EXTRUDE8_DEPTH, mode=Mode.SUBTRACT)


solid = part.part
